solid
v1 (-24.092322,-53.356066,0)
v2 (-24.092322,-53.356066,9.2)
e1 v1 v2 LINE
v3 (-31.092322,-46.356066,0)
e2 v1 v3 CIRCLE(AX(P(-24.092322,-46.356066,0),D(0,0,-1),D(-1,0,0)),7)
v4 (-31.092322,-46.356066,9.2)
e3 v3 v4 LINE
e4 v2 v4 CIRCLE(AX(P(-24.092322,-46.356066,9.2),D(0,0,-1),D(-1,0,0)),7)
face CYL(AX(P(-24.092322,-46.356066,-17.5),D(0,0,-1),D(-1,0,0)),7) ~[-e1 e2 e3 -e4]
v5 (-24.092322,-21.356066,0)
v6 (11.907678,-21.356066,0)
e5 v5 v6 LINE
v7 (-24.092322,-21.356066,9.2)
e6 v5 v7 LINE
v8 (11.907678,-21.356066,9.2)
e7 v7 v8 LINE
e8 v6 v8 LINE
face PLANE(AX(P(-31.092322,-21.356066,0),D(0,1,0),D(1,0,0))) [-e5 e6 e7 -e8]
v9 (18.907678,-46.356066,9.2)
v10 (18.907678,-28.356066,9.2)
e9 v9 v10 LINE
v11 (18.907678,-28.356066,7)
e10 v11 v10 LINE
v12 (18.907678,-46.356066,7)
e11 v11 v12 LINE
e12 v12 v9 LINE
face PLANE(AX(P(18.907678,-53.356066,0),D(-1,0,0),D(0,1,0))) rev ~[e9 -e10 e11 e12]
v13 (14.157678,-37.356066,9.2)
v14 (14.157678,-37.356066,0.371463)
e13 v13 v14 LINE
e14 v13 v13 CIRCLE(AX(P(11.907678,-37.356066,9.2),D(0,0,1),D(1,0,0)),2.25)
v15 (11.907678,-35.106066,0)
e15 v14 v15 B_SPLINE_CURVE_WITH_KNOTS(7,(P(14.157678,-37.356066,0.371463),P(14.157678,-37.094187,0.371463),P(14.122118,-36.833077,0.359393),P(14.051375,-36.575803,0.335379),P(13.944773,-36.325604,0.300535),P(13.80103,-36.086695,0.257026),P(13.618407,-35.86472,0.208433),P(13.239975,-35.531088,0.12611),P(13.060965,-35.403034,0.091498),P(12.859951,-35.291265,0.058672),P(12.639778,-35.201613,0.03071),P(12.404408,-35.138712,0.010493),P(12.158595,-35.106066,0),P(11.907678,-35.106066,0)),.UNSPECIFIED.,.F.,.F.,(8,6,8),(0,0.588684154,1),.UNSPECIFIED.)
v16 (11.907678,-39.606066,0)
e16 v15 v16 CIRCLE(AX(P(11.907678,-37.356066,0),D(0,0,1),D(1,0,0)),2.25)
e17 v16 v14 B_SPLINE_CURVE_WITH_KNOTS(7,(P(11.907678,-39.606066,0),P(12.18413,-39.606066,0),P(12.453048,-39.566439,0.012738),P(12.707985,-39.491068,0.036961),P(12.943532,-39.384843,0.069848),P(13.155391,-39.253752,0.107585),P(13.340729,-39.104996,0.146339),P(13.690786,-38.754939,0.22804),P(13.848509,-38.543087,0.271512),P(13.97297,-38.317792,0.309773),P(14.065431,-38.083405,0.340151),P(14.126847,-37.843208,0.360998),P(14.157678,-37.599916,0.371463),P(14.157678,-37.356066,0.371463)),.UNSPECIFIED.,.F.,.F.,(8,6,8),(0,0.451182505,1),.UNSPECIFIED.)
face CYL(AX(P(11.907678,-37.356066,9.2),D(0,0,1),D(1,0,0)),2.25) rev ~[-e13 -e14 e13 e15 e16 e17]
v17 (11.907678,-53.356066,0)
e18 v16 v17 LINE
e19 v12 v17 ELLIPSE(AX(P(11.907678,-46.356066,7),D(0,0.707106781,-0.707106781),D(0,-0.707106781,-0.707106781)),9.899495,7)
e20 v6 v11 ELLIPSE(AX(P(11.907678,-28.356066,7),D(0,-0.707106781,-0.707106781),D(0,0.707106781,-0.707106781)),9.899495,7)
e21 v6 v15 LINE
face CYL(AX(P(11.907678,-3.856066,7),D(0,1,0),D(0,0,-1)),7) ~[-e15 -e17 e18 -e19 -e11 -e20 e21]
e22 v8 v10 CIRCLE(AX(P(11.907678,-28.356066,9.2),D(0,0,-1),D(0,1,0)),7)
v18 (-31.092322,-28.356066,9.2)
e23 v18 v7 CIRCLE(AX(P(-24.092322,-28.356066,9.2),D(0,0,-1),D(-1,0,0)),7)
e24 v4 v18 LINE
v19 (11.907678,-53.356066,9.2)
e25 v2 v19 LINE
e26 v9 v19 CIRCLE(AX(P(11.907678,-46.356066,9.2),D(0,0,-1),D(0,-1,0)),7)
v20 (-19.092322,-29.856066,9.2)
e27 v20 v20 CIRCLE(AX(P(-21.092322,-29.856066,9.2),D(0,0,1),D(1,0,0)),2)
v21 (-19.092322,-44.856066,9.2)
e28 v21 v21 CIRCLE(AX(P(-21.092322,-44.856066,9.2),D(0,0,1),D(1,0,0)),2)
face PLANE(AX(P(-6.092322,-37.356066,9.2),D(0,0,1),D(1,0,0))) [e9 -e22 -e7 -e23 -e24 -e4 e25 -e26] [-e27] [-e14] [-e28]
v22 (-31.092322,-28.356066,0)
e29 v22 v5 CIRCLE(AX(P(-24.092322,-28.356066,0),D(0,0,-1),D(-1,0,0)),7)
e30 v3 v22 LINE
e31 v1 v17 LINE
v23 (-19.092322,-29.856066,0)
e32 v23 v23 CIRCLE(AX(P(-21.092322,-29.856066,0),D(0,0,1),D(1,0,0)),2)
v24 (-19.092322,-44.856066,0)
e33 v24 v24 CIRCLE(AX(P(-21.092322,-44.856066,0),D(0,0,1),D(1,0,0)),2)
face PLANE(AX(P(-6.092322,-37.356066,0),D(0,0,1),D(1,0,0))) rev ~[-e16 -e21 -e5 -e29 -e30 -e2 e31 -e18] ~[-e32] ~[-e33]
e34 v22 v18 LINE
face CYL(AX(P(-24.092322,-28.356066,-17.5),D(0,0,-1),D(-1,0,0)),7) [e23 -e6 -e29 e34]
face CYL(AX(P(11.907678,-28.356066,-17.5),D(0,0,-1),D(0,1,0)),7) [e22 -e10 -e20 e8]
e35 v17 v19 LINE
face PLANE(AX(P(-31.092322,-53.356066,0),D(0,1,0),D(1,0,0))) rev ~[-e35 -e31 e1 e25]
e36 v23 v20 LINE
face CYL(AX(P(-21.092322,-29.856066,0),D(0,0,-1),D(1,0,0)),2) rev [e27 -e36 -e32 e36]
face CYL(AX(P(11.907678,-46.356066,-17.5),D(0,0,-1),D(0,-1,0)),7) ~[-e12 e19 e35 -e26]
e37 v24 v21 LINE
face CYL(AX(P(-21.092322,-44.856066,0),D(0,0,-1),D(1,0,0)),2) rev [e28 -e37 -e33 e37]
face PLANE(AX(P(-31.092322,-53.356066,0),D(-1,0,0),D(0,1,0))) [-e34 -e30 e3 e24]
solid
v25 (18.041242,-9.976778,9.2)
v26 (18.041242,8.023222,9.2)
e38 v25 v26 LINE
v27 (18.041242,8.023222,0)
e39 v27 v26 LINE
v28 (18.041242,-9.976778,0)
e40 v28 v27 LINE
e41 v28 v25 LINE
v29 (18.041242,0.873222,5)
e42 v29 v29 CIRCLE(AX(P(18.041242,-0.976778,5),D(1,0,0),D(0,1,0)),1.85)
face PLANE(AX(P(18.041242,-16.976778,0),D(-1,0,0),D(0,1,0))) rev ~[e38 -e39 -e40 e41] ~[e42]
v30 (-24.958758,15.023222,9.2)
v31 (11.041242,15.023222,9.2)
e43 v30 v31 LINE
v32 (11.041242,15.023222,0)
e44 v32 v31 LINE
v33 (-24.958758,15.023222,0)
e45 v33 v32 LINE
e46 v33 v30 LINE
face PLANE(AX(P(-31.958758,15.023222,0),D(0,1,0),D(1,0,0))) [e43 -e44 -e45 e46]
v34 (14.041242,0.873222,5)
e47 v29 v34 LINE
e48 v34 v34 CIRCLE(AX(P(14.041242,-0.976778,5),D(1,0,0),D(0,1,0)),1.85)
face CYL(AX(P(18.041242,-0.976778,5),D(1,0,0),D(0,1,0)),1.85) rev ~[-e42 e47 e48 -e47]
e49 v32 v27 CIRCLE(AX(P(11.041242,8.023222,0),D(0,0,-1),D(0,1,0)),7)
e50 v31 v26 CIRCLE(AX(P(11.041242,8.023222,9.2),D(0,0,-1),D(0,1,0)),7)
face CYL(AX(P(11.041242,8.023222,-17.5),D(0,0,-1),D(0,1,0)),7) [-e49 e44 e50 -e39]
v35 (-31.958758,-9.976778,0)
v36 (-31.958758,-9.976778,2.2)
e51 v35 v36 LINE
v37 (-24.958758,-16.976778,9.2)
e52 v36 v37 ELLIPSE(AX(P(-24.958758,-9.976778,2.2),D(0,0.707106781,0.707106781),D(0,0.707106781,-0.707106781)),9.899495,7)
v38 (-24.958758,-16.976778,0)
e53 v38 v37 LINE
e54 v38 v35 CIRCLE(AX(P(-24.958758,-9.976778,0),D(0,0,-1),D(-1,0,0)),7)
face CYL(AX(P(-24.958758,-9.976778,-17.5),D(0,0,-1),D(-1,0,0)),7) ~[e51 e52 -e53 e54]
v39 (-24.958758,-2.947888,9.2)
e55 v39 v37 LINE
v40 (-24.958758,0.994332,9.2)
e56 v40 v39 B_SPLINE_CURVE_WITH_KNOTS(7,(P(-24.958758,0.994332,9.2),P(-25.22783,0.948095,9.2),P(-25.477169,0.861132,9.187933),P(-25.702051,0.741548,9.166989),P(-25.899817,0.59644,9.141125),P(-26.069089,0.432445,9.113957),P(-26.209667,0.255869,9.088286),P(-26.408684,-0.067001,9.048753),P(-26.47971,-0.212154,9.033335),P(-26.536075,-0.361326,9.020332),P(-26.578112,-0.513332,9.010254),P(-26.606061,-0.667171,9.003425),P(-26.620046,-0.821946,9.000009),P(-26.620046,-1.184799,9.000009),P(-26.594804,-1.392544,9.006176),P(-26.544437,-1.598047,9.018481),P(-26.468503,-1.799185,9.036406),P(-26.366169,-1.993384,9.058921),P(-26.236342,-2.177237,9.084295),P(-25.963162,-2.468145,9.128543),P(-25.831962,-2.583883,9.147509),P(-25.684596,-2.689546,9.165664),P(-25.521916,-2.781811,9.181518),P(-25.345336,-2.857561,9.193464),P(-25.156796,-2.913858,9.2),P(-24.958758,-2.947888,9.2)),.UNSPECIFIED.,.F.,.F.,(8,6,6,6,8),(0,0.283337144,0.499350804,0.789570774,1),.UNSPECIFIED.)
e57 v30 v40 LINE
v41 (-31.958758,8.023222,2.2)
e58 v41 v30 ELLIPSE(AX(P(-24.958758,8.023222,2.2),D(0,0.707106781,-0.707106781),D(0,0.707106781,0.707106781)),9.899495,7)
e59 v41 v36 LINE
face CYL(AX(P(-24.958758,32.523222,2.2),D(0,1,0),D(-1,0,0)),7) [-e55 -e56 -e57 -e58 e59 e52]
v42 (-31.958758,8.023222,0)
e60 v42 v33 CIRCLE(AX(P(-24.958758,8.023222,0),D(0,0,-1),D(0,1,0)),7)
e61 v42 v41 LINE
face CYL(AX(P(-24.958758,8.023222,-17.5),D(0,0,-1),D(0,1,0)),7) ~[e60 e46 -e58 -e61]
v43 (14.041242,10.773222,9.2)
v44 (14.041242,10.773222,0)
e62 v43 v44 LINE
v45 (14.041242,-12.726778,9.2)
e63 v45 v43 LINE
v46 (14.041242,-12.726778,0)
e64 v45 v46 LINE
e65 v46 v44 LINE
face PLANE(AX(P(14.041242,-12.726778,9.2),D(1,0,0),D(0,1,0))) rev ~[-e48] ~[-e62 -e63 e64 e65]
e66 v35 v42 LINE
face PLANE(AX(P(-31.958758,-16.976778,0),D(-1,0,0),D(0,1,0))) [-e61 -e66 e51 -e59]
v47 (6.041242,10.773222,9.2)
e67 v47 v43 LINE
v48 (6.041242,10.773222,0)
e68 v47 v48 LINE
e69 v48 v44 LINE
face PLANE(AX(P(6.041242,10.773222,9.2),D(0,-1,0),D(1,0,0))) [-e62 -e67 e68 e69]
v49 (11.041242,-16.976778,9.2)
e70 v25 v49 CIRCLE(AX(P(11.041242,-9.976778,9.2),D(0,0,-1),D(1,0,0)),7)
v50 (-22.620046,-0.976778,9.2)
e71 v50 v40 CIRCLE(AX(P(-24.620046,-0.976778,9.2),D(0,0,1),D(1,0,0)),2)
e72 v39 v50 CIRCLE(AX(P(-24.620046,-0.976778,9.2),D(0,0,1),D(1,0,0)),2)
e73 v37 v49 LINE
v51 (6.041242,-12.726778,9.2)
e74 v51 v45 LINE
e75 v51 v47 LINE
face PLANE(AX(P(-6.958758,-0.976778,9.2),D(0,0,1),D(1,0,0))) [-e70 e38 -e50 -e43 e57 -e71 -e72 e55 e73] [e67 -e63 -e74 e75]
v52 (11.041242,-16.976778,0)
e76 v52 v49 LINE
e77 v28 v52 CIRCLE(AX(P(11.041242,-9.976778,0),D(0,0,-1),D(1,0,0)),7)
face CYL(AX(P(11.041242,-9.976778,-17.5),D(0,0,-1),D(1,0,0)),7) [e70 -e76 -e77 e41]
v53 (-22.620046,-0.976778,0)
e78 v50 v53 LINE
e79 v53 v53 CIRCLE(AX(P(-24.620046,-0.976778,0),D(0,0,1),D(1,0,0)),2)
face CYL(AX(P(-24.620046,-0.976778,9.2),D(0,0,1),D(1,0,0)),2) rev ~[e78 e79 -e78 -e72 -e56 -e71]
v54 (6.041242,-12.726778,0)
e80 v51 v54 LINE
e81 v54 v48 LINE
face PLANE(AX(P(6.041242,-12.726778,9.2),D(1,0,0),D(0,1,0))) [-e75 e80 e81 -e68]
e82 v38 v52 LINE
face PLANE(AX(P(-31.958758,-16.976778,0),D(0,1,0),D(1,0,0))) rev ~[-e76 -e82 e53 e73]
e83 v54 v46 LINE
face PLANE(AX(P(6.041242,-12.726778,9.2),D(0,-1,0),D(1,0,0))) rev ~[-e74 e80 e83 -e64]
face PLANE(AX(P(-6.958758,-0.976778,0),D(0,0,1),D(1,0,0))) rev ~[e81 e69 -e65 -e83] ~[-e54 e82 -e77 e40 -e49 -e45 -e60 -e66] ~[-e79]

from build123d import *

# Parameters (mm, degrees)
F0_W          = 50
F0_H          = 32
F1_DEPTH      = 9.2
F0_R          = 2
F2_W          = 8
F2_H          = 23.5
F2_R          = 2
F3_DEPTH      = 25
F4_R          = 1.85
F5_DEPTH      = 5
F6_R          = 2.25
F7_DEPTH      = 25
F8_T1_DEPTH   = 44.2
F8_T3_DEPTH   = 67
F8_2_T1_DEPTH = 67
F8_2_T3_DEPTH = 44.2


# Not quite as in the source:
# - a fillet or chamfer that OpenCascade refuses, or shapes differently, is made with other operations: its cross-section is extruded or revolved along the edge and cut away or added
# - a feature names something its author has since deleted; it is built from what else it names


with BuildPart() as f1:
    # F0 (on Top) → F1 (new body)
    with BuildSketch(Plane.XY):
        with Locations((-6.9587575272, -0.9767782996)):
            Rectangle(F0_W, F0_H)
    extrude(amount=F1_DEPTH)

    # F2 (on face) → F3 (cut)
    with BuildSketch(Plane.XY.offset(9.2)):
        with Locations((10.0412424728, -0.9767782996)):
            Rectangle(F2_W, F2_H)
        with Locations((-24.6200456972, -0.9767782996)):
            Circle(F2_R)
    extrude(amount=-F3_DEPTH, mode=Mode.SUBTRACT)

    # F4 (on face) → F5 (cut)
    with BuildSketch(Plane.YZ.offset(18.0412424728)):
        with Locations((-0.9767782996, 5)):
            Circle(F4_R)
    extrude(amount=-F5_DEPTH, mode=Mode.SUBTRACT)

    # F8#2: fillet of radius 7 on 5 edges, made by hand

    # F8_2_s2 → F8_2_t1 (cut)
    with BuildSketch(Plane.XZ.offset(-32.5232217004)):
        with BuildLine():
            ThreePointArc((-31.9587575272, 2.2), (-29.9085049955, 7.1497474683), (-24.9587575272, 9.2))
            Line((-24.9587575272, 9.2), (-31.9587575272, 9.2))
            Line((-31.9587575272, 9.2), (-31.9587575272, 2.2))
        make_face()
    extrude(amount=F8_2_T1_DEPTH, mode=Mode.SUBTRACT)

    # F8_2_s4 → F8_2_t3 (cut)
    with BuildSketch(Plane.XY.offset(-17.5)):
        with BuildLine():
            ThreePointArc((-31.9587575272, -9.9767782996), (-29.9085049955, -14.9265257679), (-24.9587575272, -16.9767782996))
            Line((-24.9587575272, -16.9767782996), (-31.9587575272, -16.9767782996))
            Line((-31.9587575272, -16.9767782996), (-31.9587575272, -9.9767782996))
        make_face()
        with BuildLine():
            ThreePointArc((-24.9587575272, 15.0232217004), (-29.9085049955, 12.9729691687), (-31.9587575272, 8.0232217004))
            Line((-31.9587575272, 8.0232217004), (-31.9587575272, 15.0232217004))
            Line((-31.9587575272, 15.0232217004), (-24.9587575272, 15.0232217004))
        make_face()
        with BuildLine():
            ThreePointArc((18.0412424728, -9.9767782996), (15.9909899411, -14.9265257679), (11.0412424728, -16.9767782996))
            Line((11.0412424728, -16.9767782996), (18.0412424728, -16.9767782996))
            Line((18.0412424728, -16.9767782996), (18.0412424728, -9.9767782996))
        make_face()
        with BuildLine():
            ThreePointArc((11.0412424728, 15.0232217004), (15.9909899411, 12.9729691687), (18.0412424728, 8.0232217004))
            Line((18.0412424728, 8.0232217004), (18.0412424728, 15.0232217004))
            Line((18.0412424728, 15.0232217004), (11.0412424728, 15.0232217004))
        make_face()
    extrude(amount=F8_2_T3_DEPTH, mode=Mode.SUBTRACT)


with BuildPart() as f1b:
    # F0 (on Top) → F1, piece 2 (new body)
    with BuildSketch(Plane.XY):
        with Locations((-6.0923215002, -37.3560663462)):
            Rectangle(F0_W, F0_H)
        with Locations((-21.0923215002, -44.8560663462)):
            Circle(F0_R, mode=Mode.SUBTRACT)
        with Locations((-21.0923215002, -29.8560663462)):
            Circle(F0_R, mode=Mode.SUBTRACT)
    extrude(amount=F1_DEPTH)

    # F6 (on face) → F7 (cut)
    with BuildSketch(Plane.XY.offset(9.2)):
        with Locations((11.9076784998, -37.3560663462)):
            Circle(F6_R)
    extrude(amount=-F7_DEPTH, mode=Mode.SUBTRACT)

    # F8: fillet of radius 7 on 5 edges, made by hand

    # F8_s2 → F8_t1 (cut)
    with BuildSketch(Plane.XY.offset(-17.5)):
        with BuildLine():
            ThreePointArc((11.9076784998, -21.3560663462), (16.8574259681, -23.4063188779), (18.9076784998, -28.3560663462))
            Line((18.9076784998, -28.3560663462), (18.9076784998, -21.3560663462))
            Line((18.9076784998, -21.3560663462), (11.9076784998, -21.3560663462))
        make_face()
        with BuildLine():
            ThreePointArc((11.9076784998, -53.3560663462), (16.8574259681, -51.3058138145), (18.9076784998, -46.3560663462))
            Line((18.9076784998, -46.3560663462), (18.9076784998, -53.3560663462))
            Line((18.9076784998, -53.3560663462), (11.9076784998, -53.3560663462))
        make_face()
        with BuildLine():
            ThreePointArc((-31.0923215002, -46.3560663462), (-29.0420689685, -51.3058138145), (-24.0923215002, -53.3560663462))
            Line((-24.0923215002, -53.3560663462), (-31.0923215002, -53.3560663462))
            Line((-31.0923215002, -53.3560663462), (-31.0923215002, -46.3560663462))
        make_face()
        with BuildLine():
            ThreePointArc((-31.0923215002, -28.3560663462), (-29.0420689685, -23.4063188779), (-24.0923215002, -21.3560663462))
            Line((-24.0923215002, -21.3560663462), (-31.0923215002, -21.3560663462))
            Line((-31.0923215002, -21.3560663462), (-31.0923215002, -28.3560663462))
        make_face()
    extrude(amount=F8_T1_DEPTH, mode=Mode.SUBTRACT)

    # F8_s4 → F8_t3 (cut)
    with BuildSketch(Plane.XZ.offset(3.8560663462)):
        with BuildLine():
            ThreePointArc((11.9076784998, 0), (16.8574259681, 2.0502525317), (18.9076784998, 7))
            Line((18.9076784998, 7), (18.9076784998, 0))
            Line((18.9076784998, 0), (11.9076784998, 0))
        make_face()
    extrude(amount=F8_T3_DEPTH, mode=Mode.SUBTRACT)


solid = Compound([f1.part, f1b.part])
